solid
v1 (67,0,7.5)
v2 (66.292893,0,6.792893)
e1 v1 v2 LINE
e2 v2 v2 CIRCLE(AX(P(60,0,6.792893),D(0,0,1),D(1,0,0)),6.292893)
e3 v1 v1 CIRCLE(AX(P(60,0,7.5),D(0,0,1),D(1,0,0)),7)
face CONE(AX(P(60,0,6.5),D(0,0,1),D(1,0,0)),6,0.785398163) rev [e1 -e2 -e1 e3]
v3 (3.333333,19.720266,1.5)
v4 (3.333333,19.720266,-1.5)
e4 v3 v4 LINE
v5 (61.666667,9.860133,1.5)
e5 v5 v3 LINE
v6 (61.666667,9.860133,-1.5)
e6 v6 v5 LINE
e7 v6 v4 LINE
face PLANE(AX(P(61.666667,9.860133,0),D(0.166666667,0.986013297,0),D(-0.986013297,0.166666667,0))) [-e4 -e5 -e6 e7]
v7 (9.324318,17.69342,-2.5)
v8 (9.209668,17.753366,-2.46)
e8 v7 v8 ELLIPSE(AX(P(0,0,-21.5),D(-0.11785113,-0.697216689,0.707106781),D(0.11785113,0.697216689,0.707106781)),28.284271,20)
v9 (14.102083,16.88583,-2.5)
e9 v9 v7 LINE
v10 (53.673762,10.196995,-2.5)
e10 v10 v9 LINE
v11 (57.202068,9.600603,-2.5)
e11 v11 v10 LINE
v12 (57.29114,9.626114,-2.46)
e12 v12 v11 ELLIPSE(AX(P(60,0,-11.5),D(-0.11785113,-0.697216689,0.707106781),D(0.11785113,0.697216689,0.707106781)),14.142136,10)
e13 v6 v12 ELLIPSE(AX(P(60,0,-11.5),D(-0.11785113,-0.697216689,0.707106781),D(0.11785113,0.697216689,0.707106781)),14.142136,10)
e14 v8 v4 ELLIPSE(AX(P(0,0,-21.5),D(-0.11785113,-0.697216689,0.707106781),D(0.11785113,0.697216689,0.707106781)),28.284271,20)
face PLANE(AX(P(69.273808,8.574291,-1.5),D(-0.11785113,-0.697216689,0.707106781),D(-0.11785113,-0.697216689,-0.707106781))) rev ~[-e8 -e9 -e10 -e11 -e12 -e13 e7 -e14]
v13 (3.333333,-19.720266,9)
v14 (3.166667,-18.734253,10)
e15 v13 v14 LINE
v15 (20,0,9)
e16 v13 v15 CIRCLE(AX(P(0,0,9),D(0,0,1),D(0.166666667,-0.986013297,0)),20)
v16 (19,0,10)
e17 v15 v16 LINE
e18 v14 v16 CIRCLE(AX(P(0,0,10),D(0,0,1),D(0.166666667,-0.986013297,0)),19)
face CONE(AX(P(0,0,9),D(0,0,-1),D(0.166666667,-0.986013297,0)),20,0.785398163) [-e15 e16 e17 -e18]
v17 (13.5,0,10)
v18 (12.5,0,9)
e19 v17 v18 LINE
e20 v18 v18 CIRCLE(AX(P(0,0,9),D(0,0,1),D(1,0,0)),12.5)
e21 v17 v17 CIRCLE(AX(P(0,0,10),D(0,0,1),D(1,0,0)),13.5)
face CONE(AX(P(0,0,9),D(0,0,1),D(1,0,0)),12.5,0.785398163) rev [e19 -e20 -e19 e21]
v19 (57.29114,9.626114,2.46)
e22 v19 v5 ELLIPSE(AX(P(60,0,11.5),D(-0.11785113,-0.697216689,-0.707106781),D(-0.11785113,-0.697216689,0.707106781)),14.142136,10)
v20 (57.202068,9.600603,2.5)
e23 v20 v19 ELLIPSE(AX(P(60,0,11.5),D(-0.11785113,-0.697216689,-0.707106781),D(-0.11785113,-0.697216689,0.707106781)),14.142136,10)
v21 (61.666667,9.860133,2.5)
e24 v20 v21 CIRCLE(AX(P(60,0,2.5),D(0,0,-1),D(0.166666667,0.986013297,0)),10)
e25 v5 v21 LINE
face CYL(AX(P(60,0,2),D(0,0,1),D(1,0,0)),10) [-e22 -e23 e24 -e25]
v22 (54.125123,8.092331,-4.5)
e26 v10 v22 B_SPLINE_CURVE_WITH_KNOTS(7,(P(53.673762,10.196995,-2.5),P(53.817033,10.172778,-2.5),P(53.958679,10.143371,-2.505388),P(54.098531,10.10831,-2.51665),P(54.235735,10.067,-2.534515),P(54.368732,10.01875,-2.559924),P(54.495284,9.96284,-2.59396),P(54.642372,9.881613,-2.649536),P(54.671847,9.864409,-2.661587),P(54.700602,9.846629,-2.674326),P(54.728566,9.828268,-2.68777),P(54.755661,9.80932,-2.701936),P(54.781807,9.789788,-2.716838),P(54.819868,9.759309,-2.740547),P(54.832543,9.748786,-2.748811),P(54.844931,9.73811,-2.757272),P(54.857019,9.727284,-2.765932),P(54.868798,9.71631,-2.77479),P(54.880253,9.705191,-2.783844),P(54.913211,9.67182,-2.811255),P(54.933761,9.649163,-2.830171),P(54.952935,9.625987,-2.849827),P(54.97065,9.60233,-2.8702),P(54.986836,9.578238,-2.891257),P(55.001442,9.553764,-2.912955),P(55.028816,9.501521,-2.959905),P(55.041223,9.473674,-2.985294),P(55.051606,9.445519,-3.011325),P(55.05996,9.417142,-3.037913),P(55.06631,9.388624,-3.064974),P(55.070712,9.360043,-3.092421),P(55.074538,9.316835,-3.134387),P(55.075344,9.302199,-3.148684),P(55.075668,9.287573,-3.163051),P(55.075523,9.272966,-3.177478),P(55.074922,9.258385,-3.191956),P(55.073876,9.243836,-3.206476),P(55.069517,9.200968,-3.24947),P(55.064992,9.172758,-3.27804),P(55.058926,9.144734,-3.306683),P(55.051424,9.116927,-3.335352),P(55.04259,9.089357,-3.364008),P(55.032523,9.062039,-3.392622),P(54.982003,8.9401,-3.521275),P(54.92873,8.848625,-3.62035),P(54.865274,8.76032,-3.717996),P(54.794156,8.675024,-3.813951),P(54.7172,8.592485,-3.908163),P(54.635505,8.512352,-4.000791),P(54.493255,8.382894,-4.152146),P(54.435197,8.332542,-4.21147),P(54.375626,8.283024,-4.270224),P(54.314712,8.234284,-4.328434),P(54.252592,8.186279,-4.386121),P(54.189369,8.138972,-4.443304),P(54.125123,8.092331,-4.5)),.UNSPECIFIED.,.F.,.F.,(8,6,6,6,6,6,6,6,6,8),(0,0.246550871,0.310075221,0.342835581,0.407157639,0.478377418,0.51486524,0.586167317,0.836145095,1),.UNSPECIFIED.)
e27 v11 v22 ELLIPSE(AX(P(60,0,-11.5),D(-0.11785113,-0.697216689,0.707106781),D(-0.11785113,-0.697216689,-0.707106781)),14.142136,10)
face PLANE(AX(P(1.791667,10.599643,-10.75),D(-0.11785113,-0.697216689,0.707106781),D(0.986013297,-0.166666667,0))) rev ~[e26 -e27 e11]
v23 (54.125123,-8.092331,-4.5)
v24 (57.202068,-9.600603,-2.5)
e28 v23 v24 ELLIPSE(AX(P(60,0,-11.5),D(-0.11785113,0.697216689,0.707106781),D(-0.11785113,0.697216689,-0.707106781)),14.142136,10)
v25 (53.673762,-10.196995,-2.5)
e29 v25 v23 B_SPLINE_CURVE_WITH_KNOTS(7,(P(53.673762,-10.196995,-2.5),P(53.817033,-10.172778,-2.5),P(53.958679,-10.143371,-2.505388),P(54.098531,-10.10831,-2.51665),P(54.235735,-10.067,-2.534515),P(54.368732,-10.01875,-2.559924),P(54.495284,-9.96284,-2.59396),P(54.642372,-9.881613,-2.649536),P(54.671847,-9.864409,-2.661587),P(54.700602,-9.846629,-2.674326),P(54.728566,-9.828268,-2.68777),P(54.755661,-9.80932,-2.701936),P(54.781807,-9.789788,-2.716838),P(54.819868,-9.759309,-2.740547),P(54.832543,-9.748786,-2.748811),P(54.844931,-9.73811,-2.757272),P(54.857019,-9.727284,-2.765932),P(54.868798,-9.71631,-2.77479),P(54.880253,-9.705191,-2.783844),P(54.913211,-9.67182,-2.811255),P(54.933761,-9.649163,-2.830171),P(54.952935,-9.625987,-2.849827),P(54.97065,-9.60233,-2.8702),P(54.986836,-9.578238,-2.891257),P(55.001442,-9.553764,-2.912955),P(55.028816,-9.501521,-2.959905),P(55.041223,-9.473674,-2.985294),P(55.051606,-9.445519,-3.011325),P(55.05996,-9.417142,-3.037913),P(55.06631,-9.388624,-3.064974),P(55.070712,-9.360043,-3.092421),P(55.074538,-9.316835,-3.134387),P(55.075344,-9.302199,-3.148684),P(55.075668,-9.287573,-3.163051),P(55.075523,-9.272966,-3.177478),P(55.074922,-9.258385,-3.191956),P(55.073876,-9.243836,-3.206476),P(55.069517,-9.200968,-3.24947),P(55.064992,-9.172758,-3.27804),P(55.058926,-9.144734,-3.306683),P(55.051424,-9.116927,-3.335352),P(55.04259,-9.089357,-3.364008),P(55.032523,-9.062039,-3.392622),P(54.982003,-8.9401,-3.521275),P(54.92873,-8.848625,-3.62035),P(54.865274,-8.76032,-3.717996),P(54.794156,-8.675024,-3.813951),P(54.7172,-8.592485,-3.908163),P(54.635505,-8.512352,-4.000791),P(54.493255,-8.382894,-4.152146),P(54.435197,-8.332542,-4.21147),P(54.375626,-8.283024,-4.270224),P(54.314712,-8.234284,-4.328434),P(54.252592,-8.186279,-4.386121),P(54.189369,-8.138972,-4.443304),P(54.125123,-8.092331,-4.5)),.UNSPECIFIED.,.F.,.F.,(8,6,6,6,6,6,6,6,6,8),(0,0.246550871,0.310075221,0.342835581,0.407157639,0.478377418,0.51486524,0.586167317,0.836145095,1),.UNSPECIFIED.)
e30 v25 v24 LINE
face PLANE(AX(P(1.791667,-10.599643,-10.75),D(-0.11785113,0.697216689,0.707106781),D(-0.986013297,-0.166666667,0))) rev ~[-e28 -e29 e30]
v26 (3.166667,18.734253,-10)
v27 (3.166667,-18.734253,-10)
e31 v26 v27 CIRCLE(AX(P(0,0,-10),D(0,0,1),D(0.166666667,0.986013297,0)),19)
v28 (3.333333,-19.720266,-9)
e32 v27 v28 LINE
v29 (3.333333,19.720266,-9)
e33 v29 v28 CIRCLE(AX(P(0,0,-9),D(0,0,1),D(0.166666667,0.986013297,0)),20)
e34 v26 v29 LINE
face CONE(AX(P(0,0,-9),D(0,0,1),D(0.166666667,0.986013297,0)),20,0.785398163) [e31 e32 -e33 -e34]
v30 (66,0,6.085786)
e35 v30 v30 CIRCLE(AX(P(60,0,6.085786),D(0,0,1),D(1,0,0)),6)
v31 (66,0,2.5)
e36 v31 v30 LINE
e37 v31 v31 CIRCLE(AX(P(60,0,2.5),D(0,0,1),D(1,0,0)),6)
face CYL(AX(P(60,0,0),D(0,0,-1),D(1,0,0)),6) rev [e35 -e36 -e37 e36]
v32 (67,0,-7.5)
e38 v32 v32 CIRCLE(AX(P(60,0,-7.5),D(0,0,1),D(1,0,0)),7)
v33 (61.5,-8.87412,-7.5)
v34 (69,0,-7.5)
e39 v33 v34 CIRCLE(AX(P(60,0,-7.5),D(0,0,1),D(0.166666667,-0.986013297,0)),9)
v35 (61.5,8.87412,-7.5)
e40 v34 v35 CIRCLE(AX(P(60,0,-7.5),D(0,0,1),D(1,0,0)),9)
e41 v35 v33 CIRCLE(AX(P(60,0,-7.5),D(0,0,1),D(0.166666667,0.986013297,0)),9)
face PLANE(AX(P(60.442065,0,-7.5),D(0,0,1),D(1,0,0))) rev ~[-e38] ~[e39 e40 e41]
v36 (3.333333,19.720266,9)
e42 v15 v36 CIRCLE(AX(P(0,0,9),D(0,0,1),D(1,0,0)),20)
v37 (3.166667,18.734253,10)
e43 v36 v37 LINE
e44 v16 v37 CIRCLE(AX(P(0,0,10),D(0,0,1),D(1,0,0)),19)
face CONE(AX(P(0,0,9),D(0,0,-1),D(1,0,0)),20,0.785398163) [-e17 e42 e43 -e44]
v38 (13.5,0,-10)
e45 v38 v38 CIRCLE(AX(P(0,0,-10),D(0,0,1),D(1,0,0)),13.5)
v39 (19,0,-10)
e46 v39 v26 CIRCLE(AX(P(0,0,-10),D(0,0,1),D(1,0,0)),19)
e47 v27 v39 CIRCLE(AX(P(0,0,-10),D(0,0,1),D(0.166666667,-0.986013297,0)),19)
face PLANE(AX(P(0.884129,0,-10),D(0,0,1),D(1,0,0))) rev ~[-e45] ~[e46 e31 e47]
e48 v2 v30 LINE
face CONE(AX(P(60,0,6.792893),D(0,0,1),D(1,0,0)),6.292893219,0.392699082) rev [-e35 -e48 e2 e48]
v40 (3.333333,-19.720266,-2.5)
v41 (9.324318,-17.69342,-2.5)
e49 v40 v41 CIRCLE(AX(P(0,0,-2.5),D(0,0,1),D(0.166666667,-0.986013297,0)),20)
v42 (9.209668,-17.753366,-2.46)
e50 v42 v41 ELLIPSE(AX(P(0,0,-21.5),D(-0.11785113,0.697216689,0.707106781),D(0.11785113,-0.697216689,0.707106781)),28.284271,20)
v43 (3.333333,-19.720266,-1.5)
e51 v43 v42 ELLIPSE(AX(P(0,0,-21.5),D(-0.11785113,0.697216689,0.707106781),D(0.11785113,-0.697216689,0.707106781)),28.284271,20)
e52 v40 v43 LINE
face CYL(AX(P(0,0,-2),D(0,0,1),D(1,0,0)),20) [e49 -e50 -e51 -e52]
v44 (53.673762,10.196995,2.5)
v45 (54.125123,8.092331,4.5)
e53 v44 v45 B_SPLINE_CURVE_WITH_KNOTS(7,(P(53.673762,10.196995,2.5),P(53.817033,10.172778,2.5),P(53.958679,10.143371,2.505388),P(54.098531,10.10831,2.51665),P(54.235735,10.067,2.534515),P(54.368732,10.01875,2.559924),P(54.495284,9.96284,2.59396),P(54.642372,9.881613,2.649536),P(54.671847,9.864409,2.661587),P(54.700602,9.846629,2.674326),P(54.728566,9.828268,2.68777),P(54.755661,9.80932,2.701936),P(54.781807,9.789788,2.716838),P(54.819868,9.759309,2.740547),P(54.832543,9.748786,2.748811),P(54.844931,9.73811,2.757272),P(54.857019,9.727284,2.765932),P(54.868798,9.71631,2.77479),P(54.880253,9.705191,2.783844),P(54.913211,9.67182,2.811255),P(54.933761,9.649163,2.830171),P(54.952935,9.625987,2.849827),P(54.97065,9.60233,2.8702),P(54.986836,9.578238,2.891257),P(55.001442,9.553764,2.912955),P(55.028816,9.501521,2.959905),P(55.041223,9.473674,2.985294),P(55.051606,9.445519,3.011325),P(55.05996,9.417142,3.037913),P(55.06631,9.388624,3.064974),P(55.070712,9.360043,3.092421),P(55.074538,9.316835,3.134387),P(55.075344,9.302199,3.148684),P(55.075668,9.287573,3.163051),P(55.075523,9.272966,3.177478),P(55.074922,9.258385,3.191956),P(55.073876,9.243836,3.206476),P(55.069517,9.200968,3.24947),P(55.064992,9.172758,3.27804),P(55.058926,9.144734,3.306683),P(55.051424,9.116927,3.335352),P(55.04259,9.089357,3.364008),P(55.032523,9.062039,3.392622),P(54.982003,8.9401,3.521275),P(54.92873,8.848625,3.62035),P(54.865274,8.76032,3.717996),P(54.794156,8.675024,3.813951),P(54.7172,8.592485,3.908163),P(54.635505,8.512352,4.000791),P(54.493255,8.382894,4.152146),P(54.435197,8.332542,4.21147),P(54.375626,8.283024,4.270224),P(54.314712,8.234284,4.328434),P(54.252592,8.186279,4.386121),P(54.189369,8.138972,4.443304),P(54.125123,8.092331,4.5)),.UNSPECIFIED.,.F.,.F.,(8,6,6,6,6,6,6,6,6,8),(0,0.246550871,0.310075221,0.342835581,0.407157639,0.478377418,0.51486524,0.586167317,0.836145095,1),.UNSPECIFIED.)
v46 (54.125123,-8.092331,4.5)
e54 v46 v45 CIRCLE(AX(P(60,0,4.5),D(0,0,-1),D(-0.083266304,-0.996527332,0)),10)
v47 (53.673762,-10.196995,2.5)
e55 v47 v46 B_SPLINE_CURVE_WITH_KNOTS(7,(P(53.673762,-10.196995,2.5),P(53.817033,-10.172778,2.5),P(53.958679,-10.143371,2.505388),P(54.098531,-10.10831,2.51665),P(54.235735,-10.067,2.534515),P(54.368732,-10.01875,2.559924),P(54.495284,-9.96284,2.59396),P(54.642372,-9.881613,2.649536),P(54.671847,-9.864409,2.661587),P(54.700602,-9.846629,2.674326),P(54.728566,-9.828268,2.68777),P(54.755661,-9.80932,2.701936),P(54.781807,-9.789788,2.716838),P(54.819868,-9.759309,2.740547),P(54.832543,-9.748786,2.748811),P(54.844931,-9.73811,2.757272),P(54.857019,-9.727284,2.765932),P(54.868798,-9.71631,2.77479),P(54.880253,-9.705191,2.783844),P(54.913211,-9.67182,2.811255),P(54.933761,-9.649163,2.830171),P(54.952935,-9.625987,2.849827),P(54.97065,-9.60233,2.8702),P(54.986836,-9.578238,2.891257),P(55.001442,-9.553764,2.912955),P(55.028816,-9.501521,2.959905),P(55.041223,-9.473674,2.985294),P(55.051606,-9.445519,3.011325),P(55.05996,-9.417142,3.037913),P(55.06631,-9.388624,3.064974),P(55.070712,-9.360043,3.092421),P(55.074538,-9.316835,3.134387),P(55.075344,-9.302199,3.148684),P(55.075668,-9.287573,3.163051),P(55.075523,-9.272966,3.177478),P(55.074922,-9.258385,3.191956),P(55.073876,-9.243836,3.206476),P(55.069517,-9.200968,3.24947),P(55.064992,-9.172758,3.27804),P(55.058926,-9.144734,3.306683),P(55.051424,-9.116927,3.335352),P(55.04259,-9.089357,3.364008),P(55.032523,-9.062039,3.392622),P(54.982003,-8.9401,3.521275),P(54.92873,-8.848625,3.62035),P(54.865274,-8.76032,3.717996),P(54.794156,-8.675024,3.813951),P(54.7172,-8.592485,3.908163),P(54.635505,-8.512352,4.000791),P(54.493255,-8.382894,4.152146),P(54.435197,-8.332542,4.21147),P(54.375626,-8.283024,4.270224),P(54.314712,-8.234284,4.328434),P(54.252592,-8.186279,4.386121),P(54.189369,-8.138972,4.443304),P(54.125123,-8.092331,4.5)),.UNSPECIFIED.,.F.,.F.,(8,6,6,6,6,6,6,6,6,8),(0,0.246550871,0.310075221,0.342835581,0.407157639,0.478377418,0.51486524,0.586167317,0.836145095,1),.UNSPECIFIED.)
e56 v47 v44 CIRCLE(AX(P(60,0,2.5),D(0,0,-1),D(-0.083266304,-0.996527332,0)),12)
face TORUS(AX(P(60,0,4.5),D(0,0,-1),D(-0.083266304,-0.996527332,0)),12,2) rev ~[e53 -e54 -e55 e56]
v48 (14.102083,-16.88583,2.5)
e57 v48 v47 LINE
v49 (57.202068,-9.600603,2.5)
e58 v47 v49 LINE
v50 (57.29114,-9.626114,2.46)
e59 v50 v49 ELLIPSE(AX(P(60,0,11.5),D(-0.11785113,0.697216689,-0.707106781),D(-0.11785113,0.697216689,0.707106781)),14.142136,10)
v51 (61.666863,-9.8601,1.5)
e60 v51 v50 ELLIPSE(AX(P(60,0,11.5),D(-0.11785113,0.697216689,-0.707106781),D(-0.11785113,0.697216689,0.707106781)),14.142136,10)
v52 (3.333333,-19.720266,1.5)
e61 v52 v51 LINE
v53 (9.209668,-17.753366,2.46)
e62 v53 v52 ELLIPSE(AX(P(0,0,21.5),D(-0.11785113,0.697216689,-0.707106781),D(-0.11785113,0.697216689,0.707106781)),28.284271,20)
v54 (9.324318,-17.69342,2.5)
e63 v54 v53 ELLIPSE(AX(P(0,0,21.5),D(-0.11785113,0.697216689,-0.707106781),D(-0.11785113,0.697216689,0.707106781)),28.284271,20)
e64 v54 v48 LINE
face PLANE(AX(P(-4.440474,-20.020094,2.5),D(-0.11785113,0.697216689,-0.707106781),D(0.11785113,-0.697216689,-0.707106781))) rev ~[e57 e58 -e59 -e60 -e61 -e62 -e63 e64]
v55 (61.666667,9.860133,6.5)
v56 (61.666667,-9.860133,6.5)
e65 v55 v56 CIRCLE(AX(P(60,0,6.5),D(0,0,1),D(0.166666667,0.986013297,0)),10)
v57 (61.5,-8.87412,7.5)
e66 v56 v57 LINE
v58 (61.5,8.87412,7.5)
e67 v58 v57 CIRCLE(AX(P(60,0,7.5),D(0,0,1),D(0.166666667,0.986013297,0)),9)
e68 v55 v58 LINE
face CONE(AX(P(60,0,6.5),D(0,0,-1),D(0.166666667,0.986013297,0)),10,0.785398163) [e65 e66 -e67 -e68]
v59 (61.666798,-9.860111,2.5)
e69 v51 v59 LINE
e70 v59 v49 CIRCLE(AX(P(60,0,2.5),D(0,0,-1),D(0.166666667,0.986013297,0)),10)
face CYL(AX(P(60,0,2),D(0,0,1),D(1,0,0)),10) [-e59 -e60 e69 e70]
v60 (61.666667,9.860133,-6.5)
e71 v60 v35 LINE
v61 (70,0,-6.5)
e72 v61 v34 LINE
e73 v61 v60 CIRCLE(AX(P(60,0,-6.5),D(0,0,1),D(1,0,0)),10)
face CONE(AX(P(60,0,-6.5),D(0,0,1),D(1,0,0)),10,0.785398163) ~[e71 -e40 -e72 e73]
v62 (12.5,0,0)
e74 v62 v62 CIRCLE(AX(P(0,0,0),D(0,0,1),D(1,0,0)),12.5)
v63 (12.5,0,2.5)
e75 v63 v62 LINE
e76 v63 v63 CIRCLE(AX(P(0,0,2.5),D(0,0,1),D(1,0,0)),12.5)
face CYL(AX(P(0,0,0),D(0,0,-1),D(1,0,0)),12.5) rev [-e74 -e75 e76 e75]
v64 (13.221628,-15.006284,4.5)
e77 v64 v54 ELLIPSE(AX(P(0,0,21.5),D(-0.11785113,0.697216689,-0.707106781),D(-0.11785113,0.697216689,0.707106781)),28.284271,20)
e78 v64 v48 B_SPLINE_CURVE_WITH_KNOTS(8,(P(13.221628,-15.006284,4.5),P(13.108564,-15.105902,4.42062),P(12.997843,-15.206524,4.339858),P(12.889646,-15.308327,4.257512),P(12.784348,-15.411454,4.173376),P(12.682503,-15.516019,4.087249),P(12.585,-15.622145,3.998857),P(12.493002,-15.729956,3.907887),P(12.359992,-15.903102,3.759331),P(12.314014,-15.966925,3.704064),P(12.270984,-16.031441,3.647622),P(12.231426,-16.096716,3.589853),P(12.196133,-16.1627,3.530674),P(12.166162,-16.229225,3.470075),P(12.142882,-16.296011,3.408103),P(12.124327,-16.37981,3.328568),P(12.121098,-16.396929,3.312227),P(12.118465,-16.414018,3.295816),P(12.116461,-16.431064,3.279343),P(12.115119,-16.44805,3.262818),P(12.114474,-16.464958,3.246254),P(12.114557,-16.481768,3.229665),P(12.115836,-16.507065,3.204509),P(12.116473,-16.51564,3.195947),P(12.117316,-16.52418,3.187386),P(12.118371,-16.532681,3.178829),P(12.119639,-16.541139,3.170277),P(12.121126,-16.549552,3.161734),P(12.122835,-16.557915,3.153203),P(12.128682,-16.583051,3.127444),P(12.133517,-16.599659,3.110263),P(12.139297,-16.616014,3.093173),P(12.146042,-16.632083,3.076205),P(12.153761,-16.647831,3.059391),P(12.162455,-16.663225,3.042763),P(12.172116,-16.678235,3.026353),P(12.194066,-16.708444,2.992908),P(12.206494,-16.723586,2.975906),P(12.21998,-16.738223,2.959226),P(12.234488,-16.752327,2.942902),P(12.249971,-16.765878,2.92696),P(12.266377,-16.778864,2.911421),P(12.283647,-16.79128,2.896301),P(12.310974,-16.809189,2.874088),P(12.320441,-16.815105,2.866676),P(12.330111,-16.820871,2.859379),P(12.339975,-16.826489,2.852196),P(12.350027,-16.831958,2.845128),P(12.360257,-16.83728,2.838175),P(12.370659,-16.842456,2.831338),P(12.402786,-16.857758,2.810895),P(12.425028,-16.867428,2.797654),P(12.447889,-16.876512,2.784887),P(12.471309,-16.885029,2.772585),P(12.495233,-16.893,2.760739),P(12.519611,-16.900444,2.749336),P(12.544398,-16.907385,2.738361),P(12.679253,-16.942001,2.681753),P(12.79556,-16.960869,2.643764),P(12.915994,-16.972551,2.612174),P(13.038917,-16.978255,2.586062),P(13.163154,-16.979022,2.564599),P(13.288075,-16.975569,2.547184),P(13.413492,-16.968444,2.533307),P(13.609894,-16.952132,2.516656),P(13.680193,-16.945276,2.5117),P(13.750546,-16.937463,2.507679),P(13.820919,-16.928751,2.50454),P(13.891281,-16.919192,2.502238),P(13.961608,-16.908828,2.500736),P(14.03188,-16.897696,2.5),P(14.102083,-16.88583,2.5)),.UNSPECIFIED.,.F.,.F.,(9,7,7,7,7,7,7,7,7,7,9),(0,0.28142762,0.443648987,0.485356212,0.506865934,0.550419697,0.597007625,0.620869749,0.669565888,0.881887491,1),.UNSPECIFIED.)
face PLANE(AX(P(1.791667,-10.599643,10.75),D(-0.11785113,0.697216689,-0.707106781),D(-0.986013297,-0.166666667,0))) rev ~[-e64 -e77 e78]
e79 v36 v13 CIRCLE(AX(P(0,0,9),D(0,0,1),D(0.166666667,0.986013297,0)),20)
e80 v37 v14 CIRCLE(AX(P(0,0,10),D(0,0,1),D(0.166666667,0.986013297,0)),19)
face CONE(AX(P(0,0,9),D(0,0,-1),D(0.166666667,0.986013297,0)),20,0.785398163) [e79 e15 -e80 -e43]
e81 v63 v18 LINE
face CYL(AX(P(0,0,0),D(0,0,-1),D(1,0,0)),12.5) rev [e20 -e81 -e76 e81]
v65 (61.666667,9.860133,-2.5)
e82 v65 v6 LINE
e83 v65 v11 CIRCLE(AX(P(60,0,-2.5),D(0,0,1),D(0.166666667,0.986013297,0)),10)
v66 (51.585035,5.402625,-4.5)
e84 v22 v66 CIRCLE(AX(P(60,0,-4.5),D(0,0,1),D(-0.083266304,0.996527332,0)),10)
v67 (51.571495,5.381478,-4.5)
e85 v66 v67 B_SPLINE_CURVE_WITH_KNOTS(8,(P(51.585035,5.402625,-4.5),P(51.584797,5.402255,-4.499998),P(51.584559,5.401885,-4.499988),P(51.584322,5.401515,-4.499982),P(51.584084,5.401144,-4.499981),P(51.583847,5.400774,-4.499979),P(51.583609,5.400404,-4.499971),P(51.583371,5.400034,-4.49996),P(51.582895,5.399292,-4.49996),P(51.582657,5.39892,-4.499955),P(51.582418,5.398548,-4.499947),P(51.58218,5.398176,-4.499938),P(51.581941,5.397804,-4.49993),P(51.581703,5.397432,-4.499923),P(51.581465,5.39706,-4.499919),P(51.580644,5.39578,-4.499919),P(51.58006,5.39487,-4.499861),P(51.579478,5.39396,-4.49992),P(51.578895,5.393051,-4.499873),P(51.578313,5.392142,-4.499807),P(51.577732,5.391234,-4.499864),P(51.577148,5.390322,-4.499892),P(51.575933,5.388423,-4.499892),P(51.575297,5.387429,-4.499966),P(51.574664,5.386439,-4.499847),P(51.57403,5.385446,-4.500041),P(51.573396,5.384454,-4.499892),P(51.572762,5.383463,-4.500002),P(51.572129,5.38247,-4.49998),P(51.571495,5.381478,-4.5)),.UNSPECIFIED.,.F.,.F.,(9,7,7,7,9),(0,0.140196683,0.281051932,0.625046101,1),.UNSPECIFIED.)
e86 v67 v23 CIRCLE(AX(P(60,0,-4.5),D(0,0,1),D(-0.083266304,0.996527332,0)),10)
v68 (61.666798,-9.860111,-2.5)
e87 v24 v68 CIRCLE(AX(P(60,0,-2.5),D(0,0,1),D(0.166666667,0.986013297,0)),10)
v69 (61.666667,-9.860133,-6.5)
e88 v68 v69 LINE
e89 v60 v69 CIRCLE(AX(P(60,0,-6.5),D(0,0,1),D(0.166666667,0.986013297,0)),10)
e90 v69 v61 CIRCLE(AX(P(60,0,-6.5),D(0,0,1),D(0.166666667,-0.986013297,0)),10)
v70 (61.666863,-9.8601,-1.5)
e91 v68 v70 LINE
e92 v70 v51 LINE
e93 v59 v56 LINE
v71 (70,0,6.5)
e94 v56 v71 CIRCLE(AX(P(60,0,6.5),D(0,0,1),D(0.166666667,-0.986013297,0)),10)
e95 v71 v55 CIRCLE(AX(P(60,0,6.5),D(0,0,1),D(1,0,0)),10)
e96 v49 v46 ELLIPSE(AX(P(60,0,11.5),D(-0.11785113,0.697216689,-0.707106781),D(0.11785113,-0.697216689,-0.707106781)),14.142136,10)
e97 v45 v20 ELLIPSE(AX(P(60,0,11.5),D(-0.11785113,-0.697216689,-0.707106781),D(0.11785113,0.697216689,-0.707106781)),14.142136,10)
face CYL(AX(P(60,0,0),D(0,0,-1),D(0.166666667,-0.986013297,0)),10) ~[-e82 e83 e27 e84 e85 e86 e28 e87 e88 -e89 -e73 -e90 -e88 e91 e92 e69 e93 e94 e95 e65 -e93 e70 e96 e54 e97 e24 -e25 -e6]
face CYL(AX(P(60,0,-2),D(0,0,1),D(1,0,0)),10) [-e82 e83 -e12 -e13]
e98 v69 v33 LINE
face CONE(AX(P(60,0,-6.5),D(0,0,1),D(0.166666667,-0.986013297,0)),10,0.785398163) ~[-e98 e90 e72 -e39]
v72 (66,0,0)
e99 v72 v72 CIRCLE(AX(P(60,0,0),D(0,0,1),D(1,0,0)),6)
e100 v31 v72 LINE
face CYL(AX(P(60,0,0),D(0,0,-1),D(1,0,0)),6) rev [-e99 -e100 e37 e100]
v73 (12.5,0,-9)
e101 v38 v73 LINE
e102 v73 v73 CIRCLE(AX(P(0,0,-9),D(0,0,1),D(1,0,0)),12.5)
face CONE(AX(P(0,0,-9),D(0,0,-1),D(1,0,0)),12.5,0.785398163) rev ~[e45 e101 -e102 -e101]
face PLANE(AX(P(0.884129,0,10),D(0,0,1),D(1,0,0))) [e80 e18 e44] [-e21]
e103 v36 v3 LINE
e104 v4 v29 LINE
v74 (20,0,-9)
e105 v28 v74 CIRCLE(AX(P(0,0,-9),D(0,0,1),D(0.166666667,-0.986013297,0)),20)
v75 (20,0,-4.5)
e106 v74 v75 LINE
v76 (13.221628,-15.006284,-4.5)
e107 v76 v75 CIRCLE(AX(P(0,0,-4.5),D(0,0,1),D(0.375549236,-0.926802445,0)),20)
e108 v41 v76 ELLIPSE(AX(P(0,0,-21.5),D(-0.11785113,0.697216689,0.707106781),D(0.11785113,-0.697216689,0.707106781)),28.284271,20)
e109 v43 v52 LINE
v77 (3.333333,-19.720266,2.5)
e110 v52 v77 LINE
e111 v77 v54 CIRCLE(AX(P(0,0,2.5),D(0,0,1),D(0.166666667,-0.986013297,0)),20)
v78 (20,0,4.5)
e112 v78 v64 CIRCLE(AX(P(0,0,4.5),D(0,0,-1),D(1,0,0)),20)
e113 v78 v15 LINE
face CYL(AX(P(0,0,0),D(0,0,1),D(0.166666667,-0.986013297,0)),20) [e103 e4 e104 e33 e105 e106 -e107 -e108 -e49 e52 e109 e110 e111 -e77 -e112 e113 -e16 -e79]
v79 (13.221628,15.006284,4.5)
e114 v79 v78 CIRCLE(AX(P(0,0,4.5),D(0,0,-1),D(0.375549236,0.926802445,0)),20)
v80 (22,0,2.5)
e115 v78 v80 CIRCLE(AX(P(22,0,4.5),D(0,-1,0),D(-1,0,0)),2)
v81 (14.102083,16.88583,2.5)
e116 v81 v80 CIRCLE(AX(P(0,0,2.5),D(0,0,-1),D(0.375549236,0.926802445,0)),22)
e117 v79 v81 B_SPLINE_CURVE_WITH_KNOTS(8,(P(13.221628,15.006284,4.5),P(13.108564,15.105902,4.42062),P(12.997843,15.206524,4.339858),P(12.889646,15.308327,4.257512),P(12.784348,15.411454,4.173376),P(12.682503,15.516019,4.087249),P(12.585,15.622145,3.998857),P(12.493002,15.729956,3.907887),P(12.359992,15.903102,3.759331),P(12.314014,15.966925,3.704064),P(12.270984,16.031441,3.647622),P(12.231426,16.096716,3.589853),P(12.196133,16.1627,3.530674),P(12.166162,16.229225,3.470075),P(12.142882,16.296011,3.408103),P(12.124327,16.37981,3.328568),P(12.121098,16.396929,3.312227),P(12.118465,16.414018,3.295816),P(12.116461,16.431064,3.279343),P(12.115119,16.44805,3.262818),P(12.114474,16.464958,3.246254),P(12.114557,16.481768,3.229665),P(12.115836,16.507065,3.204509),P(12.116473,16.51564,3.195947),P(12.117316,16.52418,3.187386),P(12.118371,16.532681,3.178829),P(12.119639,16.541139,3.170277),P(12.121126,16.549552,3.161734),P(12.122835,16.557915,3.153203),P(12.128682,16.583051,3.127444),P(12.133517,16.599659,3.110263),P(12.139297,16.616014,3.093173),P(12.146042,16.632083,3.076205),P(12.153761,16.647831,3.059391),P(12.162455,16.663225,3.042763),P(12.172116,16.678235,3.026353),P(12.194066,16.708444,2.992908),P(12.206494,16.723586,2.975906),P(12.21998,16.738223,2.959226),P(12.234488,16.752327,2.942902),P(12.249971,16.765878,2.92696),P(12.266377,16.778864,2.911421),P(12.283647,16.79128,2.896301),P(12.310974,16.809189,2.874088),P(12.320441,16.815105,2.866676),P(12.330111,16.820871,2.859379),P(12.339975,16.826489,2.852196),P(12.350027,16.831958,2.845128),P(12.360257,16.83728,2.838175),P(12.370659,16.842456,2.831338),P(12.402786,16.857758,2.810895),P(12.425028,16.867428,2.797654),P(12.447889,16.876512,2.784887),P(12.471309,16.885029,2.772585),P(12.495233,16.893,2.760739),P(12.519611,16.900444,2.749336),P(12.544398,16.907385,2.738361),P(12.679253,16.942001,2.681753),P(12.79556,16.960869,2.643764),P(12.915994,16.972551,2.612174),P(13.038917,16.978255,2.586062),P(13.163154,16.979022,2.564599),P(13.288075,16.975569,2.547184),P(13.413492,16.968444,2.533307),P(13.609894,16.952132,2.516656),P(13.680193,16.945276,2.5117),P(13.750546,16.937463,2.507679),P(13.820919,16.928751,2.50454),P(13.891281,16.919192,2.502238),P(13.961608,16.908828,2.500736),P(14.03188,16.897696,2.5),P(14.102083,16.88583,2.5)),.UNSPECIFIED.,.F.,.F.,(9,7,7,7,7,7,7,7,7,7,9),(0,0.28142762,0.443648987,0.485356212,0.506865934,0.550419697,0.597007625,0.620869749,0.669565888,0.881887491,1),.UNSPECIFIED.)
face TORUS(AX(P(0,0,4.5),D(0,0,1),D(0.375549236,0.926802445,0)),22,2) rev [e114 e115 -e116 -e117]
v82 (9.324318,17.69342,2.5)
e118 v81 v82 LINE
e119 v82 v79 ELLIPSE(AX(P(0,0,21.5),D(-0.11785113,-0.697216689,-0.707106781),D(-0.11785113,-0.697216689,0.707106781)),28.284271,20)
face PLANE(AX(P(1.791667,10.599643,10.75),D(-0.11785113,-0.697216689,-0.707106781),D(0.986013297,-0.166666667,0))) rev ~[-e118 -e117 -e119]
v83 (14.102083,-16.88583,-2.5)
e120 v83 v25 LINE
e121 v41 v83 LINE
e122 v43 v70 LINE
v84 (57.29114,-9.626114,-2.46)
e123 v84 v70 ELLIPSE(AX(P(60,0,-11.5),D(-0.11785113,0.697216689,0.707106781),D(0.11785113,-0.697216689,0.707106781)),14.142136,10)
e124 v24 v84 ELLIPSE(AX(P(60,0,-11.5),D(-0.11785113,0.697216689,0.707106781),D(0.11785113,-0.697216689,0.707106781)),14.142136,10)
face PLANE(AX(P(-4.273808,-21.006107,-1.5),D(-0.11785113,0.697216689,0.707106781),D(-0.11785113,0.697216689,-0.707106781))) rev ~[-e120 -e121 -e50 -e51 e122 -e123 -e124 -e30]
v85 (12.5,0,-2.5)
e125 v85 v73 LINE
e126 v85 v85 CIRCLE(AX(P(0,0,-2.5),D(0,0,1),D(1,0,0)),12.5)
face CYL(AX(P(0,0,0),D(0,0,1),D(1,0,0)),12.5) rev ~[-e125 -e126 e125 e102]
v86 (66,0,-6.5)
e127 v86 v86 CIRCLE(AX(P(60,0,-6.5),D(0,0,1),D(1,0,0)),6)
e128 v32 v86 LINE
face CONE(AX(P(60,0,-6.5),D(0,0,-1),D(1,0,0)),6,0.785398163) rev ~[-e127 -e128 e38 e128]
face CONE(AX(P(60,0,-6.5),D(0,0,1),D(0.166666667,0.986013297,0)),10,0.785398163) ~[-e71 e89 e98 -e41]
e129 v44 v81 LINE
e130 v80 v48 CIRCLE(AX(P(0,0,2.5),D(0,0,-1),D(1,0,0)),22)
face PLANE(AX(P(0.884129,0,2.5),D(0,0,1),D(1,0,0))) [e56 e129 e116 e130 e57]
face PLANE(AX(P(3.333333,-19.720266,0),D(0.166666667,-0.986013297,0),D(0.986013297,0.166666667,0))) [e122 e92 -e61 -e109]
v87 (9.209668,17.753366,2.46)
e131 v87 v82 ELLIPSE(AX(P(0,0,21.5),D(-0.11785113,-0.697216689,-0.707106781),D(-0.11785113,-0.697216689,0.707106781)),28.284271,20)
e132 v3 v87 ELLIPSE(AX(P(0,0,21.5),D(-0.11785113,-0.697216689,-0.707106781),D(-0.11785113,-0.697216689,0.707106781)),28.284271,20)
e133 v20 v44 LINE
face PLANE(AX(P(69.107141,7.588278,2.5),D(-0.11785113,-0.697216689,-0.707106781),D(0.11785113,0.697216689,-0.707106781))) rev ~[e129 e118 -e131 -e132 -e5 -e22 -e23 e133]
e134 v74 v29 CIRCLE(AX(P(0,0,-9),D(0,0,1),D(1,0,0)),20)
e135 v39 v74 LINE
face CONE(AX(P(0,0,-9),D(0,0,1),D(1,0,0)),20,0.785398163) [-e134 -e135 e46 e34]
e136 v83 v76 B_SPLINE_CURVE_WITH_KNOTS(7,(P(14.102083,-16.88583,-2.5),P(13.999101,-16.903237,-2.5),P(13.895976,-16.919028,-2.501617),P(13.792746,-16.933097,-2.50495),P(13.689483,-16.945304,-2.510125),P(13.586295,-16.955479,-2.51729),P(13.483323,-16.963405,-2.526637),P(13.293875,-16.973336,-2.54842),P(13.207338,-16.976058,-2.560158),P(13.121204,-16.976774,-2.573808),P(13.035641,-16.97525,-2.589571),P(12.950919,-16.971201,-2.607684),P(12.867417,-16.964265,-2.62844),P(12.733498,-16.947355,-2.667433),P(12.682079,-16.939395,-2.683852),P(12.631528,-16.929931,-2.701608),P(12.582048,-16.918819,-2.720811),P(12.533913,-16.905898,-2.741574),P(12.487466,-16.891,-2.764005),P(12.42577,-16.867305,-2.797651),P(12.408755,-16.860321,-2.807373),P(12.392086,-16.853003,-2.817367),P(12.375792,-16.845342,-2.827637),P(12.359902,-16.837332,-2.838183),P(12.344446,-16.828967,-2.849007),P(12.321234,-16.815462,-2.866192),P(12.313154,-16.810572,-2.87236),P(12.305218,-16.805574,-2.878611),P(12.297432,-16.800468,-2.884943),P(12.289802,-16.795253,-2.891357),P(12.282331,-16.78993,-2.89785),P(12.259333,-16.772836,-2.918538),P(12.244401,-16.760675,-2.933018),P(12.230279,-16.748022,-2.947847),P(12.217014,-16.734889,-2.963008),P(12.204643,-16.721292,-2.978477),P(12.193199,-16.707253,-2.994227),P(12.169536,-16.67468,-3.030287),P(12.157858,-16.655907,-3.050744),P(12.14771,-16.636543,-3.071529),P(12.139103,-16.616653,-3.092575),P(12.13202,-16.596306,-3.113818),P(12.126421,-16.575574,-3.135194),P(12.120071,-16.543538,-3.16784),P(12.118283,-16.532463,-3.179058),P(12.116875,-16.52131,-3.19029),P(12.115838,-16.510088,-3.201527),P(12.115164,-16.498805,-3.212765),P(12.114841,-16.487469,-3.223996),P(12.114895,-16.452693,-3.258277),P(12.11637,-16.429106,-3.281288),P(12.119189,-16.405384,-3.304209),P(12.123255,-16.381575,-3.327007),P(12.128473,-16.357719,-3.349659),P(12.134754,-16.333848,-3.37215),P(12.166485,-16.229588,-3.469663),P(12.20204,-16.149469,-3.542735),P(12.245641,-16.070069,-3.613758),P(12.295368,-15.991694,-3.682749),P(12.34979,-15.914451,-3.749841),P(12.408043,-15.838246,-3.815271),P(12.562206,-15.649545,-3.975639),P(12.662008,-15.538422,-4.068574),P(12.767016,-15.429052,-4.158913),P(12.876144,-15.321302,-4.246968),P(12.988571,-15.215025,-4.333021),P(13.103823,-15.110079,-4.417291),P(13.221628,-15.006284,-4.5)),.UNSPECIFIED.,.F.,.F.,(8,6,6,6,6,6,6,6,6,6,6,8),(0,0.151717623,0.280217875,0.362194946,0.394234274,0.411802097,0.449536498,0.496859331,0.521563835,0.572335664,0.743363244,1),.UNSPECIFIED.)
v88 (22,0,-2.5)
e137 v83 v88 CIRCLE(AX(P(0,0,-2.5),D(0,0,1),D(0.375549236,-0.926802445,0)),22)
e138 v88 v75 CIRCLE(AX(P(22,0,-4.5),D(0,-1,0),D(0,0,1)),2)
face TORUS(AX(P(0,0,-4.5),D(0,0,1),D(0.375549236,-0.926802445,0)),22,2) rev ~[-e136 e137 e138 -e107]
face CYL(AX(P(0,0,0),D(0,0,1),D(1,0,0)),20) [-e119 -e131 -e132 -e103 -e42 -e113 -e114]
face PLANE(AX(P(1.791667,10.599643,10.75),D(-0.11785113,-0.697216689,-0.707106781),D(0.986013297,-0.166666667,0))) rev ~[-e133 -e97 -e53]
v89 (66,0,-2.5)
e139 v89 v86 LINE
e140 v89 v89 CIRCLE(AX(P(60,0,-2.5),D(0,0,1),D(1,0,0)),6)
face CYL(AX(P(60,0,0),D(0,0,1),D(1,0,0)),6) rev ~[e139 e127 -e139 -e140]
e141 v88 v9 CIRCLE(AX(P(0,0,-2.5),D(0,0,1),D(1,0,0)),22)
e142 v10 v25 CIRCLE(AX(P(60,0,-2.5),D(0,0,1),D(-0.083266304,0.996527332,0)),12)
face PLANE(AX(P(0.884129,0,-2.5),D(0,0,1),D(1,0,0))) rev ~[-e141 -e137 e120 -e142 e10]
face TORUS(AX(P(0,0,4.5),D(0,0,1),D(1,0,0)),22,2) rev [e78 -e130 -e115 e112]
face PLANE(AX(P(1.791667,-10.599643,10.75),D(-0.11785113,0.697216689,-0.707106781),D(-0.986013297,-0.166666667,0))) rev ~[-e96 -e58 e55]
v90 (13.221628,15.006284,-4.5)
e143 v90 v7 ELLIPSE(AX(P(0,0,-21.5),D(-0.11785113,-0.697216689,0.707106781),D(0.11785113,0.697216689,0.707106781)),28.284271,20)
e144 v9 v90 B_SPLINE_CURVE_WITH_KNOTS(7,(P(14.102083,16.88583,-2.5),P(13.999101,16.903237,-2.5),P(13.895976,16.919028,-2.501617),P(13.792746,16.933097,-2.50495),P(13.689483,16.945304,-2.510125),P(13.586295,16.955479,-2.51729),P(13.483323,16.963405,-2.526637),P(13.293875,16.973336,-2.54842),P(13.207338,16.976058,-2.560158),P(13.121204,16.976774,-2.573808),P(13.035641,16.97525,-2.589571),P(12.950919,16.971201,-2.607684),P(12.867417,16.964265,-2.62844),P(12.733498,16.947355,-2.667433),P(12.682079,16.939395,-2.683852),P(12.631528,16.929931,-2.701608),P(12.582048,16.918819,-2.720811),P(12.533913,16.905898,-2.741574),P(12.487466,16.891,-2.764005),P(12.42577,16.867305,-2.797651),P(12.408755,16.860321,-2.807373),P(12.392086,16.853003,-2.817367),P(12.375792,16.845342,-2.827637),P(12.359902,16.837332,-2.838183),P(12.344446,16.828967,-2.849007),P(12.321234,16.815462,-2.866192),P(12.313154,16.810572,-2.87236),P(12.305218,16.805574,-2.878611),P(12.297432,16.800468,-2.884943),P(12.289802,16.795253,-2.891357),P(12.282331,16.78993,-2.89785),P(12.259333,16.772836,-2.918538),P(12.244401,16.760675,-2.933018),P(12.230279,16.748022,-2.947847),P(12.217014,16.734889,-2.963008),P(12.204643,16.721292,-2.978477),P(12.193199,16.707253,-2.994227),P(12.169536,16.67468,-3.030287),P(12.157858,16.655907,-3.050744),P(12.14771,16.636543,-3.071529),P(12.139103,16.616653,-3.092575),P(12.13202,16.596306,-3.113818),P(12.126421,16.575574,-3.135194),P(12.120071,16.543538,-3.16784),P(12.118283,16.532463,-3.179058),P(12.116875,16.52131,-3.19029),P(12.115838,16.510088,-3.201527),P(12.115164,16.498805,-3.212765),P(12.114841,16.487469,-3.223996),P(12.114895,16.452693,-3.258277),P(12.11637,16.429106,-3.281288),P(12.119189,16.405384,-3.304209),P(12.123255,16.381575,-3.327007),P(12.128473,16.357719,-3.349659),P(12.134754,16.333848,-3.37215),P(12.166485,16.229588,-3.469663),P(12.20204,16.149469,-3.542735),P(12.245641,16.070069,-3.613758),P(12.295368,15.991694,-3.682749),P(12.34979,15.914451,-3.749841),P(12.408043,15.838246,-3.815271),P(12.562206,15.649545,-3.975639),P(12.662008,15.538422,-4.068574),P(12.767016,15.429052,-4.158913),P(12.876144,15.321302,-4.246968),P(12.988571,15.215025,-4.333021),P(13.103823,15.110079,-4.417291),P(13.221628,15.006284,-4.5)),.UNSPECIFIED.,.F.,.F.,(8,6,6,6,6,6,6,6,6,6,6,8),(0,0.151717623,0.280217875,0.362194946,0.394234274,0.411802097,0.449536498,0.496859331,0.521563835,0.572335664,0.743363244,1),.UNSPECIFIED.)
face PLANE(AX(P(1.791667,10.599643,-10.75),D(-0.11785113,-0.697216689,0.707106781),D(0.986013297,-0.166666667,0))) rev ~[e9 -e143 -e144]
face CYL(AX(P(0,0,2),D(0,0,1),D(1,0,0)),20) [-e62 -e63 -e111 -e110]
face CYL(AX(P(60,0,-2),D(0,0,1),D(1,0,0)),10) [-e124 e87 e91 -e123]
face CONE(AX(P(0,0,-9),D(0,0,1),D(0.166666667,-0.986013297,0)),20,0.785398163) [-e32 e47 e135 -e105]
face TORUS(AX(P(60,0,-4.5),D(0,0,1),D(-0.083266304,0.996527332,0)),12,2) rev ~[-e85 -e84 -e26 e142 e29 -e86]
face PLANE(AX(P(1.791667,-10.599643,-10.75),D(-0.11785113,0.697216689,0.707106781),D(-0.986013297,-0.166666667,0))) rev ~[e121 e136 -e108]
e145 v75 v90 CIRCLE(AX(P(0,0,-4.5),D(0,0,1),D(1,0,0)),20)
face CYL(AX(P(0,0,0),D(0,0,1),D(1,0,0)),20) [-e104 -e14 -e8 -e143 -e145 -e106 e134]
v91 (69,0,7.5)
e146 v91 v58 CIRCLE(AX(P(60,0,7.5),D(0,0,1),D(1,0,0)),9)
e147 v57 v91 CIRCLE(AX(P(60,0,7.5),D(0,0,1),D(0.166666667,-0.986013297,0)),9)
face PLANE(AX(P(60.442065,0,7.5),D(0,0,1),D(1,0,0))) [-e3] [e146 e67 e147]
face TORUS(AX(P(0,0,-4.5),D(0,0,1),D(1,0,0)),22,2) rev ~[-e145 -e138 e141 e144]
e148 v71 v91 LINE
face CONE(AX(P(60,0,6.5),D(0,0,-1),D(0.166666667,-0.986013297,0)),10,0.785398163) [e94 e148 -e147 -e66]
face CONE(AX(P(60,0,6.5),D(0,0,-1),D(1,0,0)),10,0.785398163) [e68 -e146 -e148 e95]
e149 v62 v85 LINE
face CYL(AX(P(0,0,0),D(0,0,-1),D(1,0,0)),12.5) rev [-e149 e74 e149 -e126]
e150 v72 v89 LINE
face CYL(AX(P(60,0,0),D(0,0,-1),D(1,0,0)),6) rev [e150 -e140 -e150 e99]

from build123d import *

# Parameters (mm, degrees)
F0_R         = 12.5
F0_R_2       = 6
F1_DEPTH     = 2.5
F2_DEPTH     = 7.5
F3_DEPTH     = 10
F4_SIZE      = 1
F5_SIZE      = 1
F6_SIZE      = 1
F7_SIZE      = 1
F8_T4_DEPTH  = 74.5908957588
F8_S5_R      = 20
F8_T6_DEPTH  = 39
F8_S7_R      = 10
F8_T8_DEPTH  = 39
F8_T12_DEPTH = 74.5908957588
F8_S13_R     = 20
F8_T14_DEPTH = 39
F8_S15_R     = 10
F8_T16_DEPTH = 39
F8_T20_DEPTH = 74.5908957588
F8_S21_R     = 20
F8_T22_DEPTH = 39
F8_S23_R     = 10
F8_T24_DEPTH = 39
F8_T28_DEPTH = 74.5908957588
F8_S29_R     = 20
F8_T30_DEPTH = 39
F8_S31_R     = 10
F8_T32_DEPTH = 39
F9_T4_ANGLE  = 67.9417369476
F9_T9_ANGLE  = 67.9417369476
F9_T14_ANGLE = 170.4473240821
F9_T20_ANGLE = 67.9417369476
F9_T25_ANGLE = 67.9417369476
F9_T30_ANGLE = 170.4473240821


# Not quite as in the source:
# - a fillet or chamfer that OpenCascade refuses, or shapes differently, is made with other operations: its cross-section is extruded or revolved along the edge and cut away or added


with BuildPart() as f1:
    # F0 (on Top) → F1 (new body, symmetric)
    with BuildSketch(Plane.XY):
        with BuildLine():
            ThreePointArc((3.3333333333, -19.7202659437), (15.2752523165, -12.9099444874), (20, 0))
            ThreePointArc((20, 0), (15.2752523165, 12.9099444874), (3.3333333333, 19.7202659437))
            ThreePointArc((3.3333333333, 19.7202659437), (-20, 0), (3.3333333333, -19.7202659437))
        make_face()
        Circle(F0_R, mode=Mode.SUBTRACT)
        with BuildLine():
            ThreePointArc((3.3333333333, 19.7202659437), (15.2752523165, 12.9099444874), (20, 0))
            ThreePointArc((20, 0), (15.2752523165, -12.9099444874), (3.3333333333, -19.7202659437))
            Line((3.3333333333, -19.7202659437), (61.6666666667, -9.8601329718))
            ThreePointArc((61.6666666667, -9.8601329718), (50, 0), (61.6666666667, 9.8601329718))
            Line((61.6666666667, 9.8601329718), (3.3333333333, 19.7202659437))
        make_face()
        with BuildLine():
            ThreePointArc((70, 0), (67.6376261583, 6.4549722437), (61.6666666667, 9.8601329718))
            ThreePointArc((61.6666666667, 9.8601329718), (50, 0), (61.6666666667, -9.8601329718))
            ThreePointArc((61.6666666667, -9.8601329718), (67.6376261583, -6.4549722437), (70, 0))
        make_face()
        with Locations((60, 0)):
            Circle(F0_R_2, mode=Mode.SUBTRACT)
    extrude(amount=F1_DEPTH, both=True)

    # F0 (on Top) → F2 (join, symmetric)
    with BuildSketch(Plane.XY):
        with BuildLine():
            ThreePointArc((70, 0), (67.6376261583, 6.4549722437), (61.6666666667, 9.8601329718))
            ThreePointArc((61.6666666667, 9.8601329718), (50, 0), (61.6666666667, -9.8601329718))
            ThreePointArc((61.6666666667, -9.8601329718), (67.6376261583, -6.4549722437), (70, 0))
        make_face()
        with Locations((60, 0)):
            Circle(F0_R_2, mode=Mode.SUBTRACT)
    extrude(amount=F2_DEPTH, both=True)

    # F0 (on Top) → F3 (join, symmetric)
    with BuildSketch(Plane.XY):
        with BuildLine():
            ThreePointArc((3.3333333333, -19.7202659437), (15.2752523165, -12.9099444874), (20, 0))
            ThreePointArc((20, 0), (15.2752523165, 12.9099444874), (3.3333333333, 19.7202659437))
            ThreePointArc((3.3333333333, 19.7202659437), (-20, 0), (3.3333333333, -19.7202659437))
        make_face()
        Circle(F0_R, mode=Mode.SUBTRACT)
    extrude(amount=F3_DEPTH, both=True)

    # F4
    f4_edges = [f1.edges().sort_by_distance(p)[0] for p in [
        (-12.5, 0, 10),
        (54, 0, 7.5),
    ]]
    chamfer(f4_edges, length=F4_SIZE)

    # F5
    f5_edges = [f1.edges().sort_by_distance(p)[0] for p in [
        (-12.5, 0, -10),
        (54, 0, 0),
        (66, 0, -1.25),
        (54, 0, -2.5),
        (66, 0, 1.25),
        (54, 0, 2.5),
        (66, 0, -5),
        (54, 0, -7.5),
    ]]
    chamfer(f5_edges, length=F5_SIZE)

    # F6
    f6_edges = [f1.edges().sort_by_distance(p)[0] for p in [
        (-20, 0, -10),
        (50, 0, -7.5),
    ]]
    chamfer(f6_edges, length=F6_SIZE)

    # F7
    f7_edges = [f1.edges().sort_by_distance(p)[0] for p in [
        (-20, 0, 10),
        (50, 0, 7.5),
    ]]
    chamfer(f7_edges, length=F7_SIZE)

    # F8: chamfer of 1 on 5 edges, made by hand


with BuildPart() as f8_tool2:
    # F8_s3 → F8_t4 (new body)
    with BuildSketch(Plane(origin=(65.9404742002, -11.1459744658, 0), x_dir=(0, 0, 1), z_dir=(-0.9860132972, 0.1666666667, 0))):
        Polygon((2.5, 19), (1.5, 20), (2.5, 20), align=None)
    extrude(amount=F8_T4_DEPTH)

    # F8_s5 → F8_t6 (cut, symmetric)
    with BuildSketch(Plane.XY.offset(2)):
        Circle(F8_S5_R)
    extrude(amount=F8_T6_DEPTH, both=True, mode=Mode.SUBTRACT)

    # F8_s7 → F8_t8 (cut, symmetric)
    with BuildSketch(Plane.XY.offset(2)):
        with Locations((60, 0)):
            Circle(F8_S7_R)
    extrude(amount=F8_T8_DEPTH, both=True, mode=Mode.SUBTRACT)


with BuildPart() as f1_1:
    add(f1.part)

    # F8_t1: cut F8_tool2
    add(f8_tool2.part, mode=Mode.SUBTRACT)


with BuildPart() as f8_tool10:
    # F8_s11 → F8_t12 (new body)
    with BuildSketch(Plane(origin=(-7.6071408668, -1.285841494, 0), x_dir=(0, 0, 1), z_dir=(0.9860132972, 0.1666666667, 0))):
        Polygon((2.5, 19), (1.5, 20), (2.5, 20), align=None)
    extrude(amount=F8_T12_DEPTH)

    # F8_s13 → F8_t14 (cut, symmetric)
    with BuildSketch(Plane.XY.offset(2)):
        Circle(F8_S13_R)
    extrude(amount=F8_T14_DEPTH, both=True, mode=Mode.SUBTRACT)

    # F8_s15 → F8_t16 (cut, symmetric)
    with BuildSketch(Plane.XY.offset(2)):
        with Locations((60, 0)):
            Circle(F8_S15_R)
    extrude(amount=F8_T16_DEPTH, both=True, mode=Mode.SUBTRACT)


with BuildPart() as f1_2:
    add(f1_1.part)

    # F8_t9: cut F8_tool10
    add(f8_tool10.part, mode=Mode.SUBTRACT)


with BuildPart() as f8_tool18:
    # F8_s19 → F8_t20 (new body)
    with BuildSketch(Plane(origin=(-7.6071408668, -1.285841494, 0), x_dir=(0, 0, 1), z_dir=(0.9860132972, 0.1666666667, 0))):
        Polygon((-1.5, 20), (-2.5, 19), (-2.5, 20), align=None)
    extrude(amount=F8_T20_DEPTH)

    # F8_s21 → F8_t22 (cut, symmetric)
    with BuildSketch(Plane.XY.offset(-2)):
        Circle(F8_S21_R)
    extrude(amount=F8_T22_DEPTH, both=True, mode=Mode.SUBTRACT)

    # F8_s23 → F8_t24 (cut, symmetric)
    with BuildSketch(Plane.XY.offset(-2)):
        with Locations((60, 0)):
            Circle(F8_S23_R)
    extrude(amount=F8_T24_DEPTH, both=True, mode=Mode.SUBTRACT)


with BuildPart() as f1_3:
    add(f1_2.part)

    # F8_t17: cut F8_tool18
    add(f8_tool18.part, mode=Mode.SUBTRACT)


with BuildPart() as f8_tool26:
    # F8_s27 → F8_t28 (new body)
    with BuildSketch(Plane(origin=(65.9404742002, -11.1459744658, 0), x_dir=(0, 0, 1), z_dir=(-0.9860132972, 0.1666666667, 0))):
        Polygon((-1.5, 20), (-2.5, 19), (-2.5, 20), align=None)
    extrude(amount=F8_T28_DEPTH)

    # F8_s29 → F8_t30 (cut, symmetric)
    with BuildSketch(Plane.XY.offset(-2)):
        Circle(F8_S29_R)
    extrude(amount=F8_T30_DEPTH, both=True, mode=Mode.SUBTRACT)

    # F8_s31 → F8_t32 (cut, symmetric)
    with BuildSketch(Plane.XY.offset(-2)):
        with Locations((60, 0)):
            Circle(F8_S31_R)
    extrude(amount=F8_T32_DEPTH, both=True, mode=Mode.SUBTRACT)


with BuildPart() as f1_4:
    add(f1_3.part)

    # F8_t25: cut F8_tool26
    add(f8_tool26.part, mode=Mode.SUBTRACT)

    # F8_s33 → F8_t34 (revolve, cut)
    with BuildSketch(Plane.XZ):
        Polygon((66.2928932188, 6.7928932188), (66, 6.0857864376), (66, 6.5), align=None)
    revolve(axis=Axis((60, 0, 6.5), (0, 0, 1)), mode=Mode.SUBTRACT)

    # F9: fillet of radius 2 on 10 edges, made by hand


with BuildPart() as f9_tool2:
    # F9_s3 → F9_t4 (revolve)
    with BuildSketch(Plane.XZ):
        with BuildLine():
            ThreePointArc((20, 4.5), (20.5857864376, 3.0857864376), (22, 2.5))
            Line((22, 2.5), (22, 2.46))
            Line((22, 2.46), (19.96, 2.46))
            Line((19.96, 2.46), (19.96, 4.5))
            Line((19.96, 4.5), (20, 4.5))
        make_face()
    revolve(axis=Axis((0, 0, 2.5), (0, 0, -1)), revolution_arc=F9_T4_ANGLE)

    split(bisect_by=Plane(origin=(1.7916666667, -10.5996429447, 10.75), x_dir=(-0.9860132972, -0.1666666667, 0), z_dir=(-0.1178511302, 0.6972166888, -0.7071067812)), keep=Keep.TOP)


with BuildPart() as f1_5:
    add(f1_4.part)

    # F9_t1: union F9_tool2
    add(f9_tool2.part)


with BuildPart() as f9_tool7:
    # F9_s8 → F9_t9 (revolve)
    with BuildSketch(Plane(origin=(0, 0, 0), x_dir=(0, 0, 1), z_dir=(-0.9268024445, 0.3755492362, 0))):
        with BuildLine():
            ThreePointArc((4.5, 20), (3.0857864376, 20.5857864376), (2.5, 22))
            Line((2.5, 22), (2.46, 22))
            Line((2.46, 22), (2.46, 19.96))
            Line((2.46, 19.96), (4.5, 19.96))
            Line((4.5, 19.96), (4.5, 20))
        make_face()
    revolve(axis=Axis((0, 0, 2.5), (0, 0, -1)), revolution_arc=F9_T9_ANGLE)

    split(bisect_by=Plane(origin=(1.7916666667, 10.5996429447, 10.75), x_dir=(0.9860132972, -0.1666666667, 0), z_dir=(-0.1178511302, -0.6972166888, -0.7071067812)), keep=Keep.TOP)


with BuildPart() as f1_6:
    add(f1_5.part)

    # F9_t6: union F9_tool7
    add(f9_tool7.part)


with BuildPart() as f9_tool12:
    # F9_s13 → F9_t14 (revolve)
    with BuildSketch(Plane(origin=(59.5840033564, -4.9786288681, 0), x_dir=(0, 0, 1), z_dir=(0.9965273316, -0.0832663041, 0))):
        with BuildLine():
            ThreePointArc((2.5, 7.0040217561), (3.0857864376, 5.5898081937), (4.5, 5.0040217561))
            Line((4.5, 5.0040217561), (4.5, 4.9640217561))
            Line((4.5, 4.9640217561), (2.46, 4.9640217561))
            Line((2.46, 4.9640217561), (2.46, 7.0040217561))
            Line((2.46, 7.0040217561), (2.5, 7.0040217561))
        make_face()
    revolve(axis=Axis((60, 0, 2.5), (0, 0, -1)), revolution_arc=F9_T14_ANGLE)

    split(bisect_by=Plane(origin=(1.7916666667, 10.5996429447, 10.75), x_dir=(0.9860132972, -0.1666666667, 0), z_dir=(-0.1178511302, -0.6972166888, -0.7071067812)), keep=Keep.TOP)

    split(bisect_by=Plane(origin=(1.7916666667, -10.5996429447, 10.75), x_dir=(-0.9860132972, -0.1666666667, 0), z_dir=(-0.1178511302, 0.6972166888, -0.7071067812)), keep=Keep.TOP)


with BuildPart() as f1_7:
    add(f1_6.part)

    # F9_t11: union F9_tool12
    add(f9_tool12.part)


with BuildPart() as f9_tool18:
    # F9_s19 → F9_t20 (revolve)
    with BuildSketch(Plane(origin=(0, 0, 0), x_dir=(0, 0, 1), z_dir=(-0.9268024445, -0.3755492362, 0))):
        with BuildLine():
            ThreePointArc((-2.5, -22), (-3.0857864376, -20.5857864376), (-4.5, -20))
            Line((-4.5, -20), (-4.5, -19.96))
            Line((-4.5, -19.96), (-2.46, -19.96))
            Line((-2.46, -19.96), (-2.46, -22))
            Line((-2.46, -22), (-2.5, -22))
        make_face()
    revolve(axis=Axis((0, 0, -2.5), (0, 0, 1)), revolution_arc=F9_T20_ANGLE)

    split(bisect_by=Plane(origin=(1.7916666667, -10.5996429447, -10.75), x_dir=(-0.9860132972, -0.1666666667, 0), z_dir=(-0.1178511302, 0.6972166888, 0.7071067812)), keep=Keep.TOP)


with BuildPart() as f1_8:
    add(f1_7.part)

    # F9_t17: union F9_tool18
    add(f9_tool18.part)


with BuildPart() as f9_tool23:
    # F9_s24 → F9_t25 (revolve)
    with BuildSketch(Plane.XZ):
        with BuildLine():
            ThreePointArc((22, -2.5), (20.5857864376, -3.0857864376), (20, -4.5))
            Line((20, -4.5), (19.96, -4.5))
            Line((19.96, -4.5), (19.96, -2.46))
            Line((19.96, -2.46), (22, -2.46))
            Line((22, -2.46), (22, -2.5))
        make_face()
    revolve(axis=Axis((0, 0, -2.5), (0, 0, 1)), revolution_arc=F9_T25_ANGLE)

    split(bisect_by=Plane(origin=(1.7916666667, 10.5996429447, -10.75), x_dir=(0.9860132972, -0.1666666667, 0), z_dir=(-0.1178511302, -0.6972166888, 0.7071067812)), keep=Keep.TOP)


with BuildPart() as f1_9:
    add(f1_8.part)

    # F9_t22: union F9_tool23
    add(f9_tool23.part)


with BuildPart() as f9_tool28:
    # F9_s29 → F9_t30 (revolve)
    with BuildSketch(Plane(origin=(59.5840033564, 4.9786288681, 0), x_dir=(0, 0, 1), z_dir=(0.9965273316, 0.0832663041, 0))):
        with BuildLine():
            ThreePointArc((-2.5, -7.0040217561), (-3.0857864376, -5.5898081937), (-4.5, -5.0040217561))
            Line((-4.5, -5.0040217561), (-4.5, -4.9640217561))
            Line((-4.5, -4.9640217561), (-2.46, -4.9640217561))
            Line((-2.46, -4.9640217561), (-2.46, -7.0040217561))
            Line((-2.46, -7.0040217561), (-2.5, -7.0040217561))
        make_face()
    revolve(axis=Axis((60, 0, -2.5), (0, 0, 1)), revolution_arc=F9_T30_ANGLE)

    split(bisect_by=Plane(origin=(1.7916666667, -10.5996429447, -10.75), x_dir=(-0.9860132972, -0.1666666667, 0), z_dir=(-0.1178511302, 0.6972166888, 0.7071067812)), keep=Keep.TOP)

    split(bisect_by=Plane(origin=(1.7916666667, 10.5996429447, -10.75), x_dir=(0.9860132972, -0.1666666667, 0), z_dir=(-0.1178511302, -0.6972166888, 0.7071067812)), keep=Keep.TOP)


with BuildPart() as f1_10:
    add(f1_9.part)

    # F9_t27: union F9_tool28
    add(f9_tool28.part)


solid = f1_10.part
